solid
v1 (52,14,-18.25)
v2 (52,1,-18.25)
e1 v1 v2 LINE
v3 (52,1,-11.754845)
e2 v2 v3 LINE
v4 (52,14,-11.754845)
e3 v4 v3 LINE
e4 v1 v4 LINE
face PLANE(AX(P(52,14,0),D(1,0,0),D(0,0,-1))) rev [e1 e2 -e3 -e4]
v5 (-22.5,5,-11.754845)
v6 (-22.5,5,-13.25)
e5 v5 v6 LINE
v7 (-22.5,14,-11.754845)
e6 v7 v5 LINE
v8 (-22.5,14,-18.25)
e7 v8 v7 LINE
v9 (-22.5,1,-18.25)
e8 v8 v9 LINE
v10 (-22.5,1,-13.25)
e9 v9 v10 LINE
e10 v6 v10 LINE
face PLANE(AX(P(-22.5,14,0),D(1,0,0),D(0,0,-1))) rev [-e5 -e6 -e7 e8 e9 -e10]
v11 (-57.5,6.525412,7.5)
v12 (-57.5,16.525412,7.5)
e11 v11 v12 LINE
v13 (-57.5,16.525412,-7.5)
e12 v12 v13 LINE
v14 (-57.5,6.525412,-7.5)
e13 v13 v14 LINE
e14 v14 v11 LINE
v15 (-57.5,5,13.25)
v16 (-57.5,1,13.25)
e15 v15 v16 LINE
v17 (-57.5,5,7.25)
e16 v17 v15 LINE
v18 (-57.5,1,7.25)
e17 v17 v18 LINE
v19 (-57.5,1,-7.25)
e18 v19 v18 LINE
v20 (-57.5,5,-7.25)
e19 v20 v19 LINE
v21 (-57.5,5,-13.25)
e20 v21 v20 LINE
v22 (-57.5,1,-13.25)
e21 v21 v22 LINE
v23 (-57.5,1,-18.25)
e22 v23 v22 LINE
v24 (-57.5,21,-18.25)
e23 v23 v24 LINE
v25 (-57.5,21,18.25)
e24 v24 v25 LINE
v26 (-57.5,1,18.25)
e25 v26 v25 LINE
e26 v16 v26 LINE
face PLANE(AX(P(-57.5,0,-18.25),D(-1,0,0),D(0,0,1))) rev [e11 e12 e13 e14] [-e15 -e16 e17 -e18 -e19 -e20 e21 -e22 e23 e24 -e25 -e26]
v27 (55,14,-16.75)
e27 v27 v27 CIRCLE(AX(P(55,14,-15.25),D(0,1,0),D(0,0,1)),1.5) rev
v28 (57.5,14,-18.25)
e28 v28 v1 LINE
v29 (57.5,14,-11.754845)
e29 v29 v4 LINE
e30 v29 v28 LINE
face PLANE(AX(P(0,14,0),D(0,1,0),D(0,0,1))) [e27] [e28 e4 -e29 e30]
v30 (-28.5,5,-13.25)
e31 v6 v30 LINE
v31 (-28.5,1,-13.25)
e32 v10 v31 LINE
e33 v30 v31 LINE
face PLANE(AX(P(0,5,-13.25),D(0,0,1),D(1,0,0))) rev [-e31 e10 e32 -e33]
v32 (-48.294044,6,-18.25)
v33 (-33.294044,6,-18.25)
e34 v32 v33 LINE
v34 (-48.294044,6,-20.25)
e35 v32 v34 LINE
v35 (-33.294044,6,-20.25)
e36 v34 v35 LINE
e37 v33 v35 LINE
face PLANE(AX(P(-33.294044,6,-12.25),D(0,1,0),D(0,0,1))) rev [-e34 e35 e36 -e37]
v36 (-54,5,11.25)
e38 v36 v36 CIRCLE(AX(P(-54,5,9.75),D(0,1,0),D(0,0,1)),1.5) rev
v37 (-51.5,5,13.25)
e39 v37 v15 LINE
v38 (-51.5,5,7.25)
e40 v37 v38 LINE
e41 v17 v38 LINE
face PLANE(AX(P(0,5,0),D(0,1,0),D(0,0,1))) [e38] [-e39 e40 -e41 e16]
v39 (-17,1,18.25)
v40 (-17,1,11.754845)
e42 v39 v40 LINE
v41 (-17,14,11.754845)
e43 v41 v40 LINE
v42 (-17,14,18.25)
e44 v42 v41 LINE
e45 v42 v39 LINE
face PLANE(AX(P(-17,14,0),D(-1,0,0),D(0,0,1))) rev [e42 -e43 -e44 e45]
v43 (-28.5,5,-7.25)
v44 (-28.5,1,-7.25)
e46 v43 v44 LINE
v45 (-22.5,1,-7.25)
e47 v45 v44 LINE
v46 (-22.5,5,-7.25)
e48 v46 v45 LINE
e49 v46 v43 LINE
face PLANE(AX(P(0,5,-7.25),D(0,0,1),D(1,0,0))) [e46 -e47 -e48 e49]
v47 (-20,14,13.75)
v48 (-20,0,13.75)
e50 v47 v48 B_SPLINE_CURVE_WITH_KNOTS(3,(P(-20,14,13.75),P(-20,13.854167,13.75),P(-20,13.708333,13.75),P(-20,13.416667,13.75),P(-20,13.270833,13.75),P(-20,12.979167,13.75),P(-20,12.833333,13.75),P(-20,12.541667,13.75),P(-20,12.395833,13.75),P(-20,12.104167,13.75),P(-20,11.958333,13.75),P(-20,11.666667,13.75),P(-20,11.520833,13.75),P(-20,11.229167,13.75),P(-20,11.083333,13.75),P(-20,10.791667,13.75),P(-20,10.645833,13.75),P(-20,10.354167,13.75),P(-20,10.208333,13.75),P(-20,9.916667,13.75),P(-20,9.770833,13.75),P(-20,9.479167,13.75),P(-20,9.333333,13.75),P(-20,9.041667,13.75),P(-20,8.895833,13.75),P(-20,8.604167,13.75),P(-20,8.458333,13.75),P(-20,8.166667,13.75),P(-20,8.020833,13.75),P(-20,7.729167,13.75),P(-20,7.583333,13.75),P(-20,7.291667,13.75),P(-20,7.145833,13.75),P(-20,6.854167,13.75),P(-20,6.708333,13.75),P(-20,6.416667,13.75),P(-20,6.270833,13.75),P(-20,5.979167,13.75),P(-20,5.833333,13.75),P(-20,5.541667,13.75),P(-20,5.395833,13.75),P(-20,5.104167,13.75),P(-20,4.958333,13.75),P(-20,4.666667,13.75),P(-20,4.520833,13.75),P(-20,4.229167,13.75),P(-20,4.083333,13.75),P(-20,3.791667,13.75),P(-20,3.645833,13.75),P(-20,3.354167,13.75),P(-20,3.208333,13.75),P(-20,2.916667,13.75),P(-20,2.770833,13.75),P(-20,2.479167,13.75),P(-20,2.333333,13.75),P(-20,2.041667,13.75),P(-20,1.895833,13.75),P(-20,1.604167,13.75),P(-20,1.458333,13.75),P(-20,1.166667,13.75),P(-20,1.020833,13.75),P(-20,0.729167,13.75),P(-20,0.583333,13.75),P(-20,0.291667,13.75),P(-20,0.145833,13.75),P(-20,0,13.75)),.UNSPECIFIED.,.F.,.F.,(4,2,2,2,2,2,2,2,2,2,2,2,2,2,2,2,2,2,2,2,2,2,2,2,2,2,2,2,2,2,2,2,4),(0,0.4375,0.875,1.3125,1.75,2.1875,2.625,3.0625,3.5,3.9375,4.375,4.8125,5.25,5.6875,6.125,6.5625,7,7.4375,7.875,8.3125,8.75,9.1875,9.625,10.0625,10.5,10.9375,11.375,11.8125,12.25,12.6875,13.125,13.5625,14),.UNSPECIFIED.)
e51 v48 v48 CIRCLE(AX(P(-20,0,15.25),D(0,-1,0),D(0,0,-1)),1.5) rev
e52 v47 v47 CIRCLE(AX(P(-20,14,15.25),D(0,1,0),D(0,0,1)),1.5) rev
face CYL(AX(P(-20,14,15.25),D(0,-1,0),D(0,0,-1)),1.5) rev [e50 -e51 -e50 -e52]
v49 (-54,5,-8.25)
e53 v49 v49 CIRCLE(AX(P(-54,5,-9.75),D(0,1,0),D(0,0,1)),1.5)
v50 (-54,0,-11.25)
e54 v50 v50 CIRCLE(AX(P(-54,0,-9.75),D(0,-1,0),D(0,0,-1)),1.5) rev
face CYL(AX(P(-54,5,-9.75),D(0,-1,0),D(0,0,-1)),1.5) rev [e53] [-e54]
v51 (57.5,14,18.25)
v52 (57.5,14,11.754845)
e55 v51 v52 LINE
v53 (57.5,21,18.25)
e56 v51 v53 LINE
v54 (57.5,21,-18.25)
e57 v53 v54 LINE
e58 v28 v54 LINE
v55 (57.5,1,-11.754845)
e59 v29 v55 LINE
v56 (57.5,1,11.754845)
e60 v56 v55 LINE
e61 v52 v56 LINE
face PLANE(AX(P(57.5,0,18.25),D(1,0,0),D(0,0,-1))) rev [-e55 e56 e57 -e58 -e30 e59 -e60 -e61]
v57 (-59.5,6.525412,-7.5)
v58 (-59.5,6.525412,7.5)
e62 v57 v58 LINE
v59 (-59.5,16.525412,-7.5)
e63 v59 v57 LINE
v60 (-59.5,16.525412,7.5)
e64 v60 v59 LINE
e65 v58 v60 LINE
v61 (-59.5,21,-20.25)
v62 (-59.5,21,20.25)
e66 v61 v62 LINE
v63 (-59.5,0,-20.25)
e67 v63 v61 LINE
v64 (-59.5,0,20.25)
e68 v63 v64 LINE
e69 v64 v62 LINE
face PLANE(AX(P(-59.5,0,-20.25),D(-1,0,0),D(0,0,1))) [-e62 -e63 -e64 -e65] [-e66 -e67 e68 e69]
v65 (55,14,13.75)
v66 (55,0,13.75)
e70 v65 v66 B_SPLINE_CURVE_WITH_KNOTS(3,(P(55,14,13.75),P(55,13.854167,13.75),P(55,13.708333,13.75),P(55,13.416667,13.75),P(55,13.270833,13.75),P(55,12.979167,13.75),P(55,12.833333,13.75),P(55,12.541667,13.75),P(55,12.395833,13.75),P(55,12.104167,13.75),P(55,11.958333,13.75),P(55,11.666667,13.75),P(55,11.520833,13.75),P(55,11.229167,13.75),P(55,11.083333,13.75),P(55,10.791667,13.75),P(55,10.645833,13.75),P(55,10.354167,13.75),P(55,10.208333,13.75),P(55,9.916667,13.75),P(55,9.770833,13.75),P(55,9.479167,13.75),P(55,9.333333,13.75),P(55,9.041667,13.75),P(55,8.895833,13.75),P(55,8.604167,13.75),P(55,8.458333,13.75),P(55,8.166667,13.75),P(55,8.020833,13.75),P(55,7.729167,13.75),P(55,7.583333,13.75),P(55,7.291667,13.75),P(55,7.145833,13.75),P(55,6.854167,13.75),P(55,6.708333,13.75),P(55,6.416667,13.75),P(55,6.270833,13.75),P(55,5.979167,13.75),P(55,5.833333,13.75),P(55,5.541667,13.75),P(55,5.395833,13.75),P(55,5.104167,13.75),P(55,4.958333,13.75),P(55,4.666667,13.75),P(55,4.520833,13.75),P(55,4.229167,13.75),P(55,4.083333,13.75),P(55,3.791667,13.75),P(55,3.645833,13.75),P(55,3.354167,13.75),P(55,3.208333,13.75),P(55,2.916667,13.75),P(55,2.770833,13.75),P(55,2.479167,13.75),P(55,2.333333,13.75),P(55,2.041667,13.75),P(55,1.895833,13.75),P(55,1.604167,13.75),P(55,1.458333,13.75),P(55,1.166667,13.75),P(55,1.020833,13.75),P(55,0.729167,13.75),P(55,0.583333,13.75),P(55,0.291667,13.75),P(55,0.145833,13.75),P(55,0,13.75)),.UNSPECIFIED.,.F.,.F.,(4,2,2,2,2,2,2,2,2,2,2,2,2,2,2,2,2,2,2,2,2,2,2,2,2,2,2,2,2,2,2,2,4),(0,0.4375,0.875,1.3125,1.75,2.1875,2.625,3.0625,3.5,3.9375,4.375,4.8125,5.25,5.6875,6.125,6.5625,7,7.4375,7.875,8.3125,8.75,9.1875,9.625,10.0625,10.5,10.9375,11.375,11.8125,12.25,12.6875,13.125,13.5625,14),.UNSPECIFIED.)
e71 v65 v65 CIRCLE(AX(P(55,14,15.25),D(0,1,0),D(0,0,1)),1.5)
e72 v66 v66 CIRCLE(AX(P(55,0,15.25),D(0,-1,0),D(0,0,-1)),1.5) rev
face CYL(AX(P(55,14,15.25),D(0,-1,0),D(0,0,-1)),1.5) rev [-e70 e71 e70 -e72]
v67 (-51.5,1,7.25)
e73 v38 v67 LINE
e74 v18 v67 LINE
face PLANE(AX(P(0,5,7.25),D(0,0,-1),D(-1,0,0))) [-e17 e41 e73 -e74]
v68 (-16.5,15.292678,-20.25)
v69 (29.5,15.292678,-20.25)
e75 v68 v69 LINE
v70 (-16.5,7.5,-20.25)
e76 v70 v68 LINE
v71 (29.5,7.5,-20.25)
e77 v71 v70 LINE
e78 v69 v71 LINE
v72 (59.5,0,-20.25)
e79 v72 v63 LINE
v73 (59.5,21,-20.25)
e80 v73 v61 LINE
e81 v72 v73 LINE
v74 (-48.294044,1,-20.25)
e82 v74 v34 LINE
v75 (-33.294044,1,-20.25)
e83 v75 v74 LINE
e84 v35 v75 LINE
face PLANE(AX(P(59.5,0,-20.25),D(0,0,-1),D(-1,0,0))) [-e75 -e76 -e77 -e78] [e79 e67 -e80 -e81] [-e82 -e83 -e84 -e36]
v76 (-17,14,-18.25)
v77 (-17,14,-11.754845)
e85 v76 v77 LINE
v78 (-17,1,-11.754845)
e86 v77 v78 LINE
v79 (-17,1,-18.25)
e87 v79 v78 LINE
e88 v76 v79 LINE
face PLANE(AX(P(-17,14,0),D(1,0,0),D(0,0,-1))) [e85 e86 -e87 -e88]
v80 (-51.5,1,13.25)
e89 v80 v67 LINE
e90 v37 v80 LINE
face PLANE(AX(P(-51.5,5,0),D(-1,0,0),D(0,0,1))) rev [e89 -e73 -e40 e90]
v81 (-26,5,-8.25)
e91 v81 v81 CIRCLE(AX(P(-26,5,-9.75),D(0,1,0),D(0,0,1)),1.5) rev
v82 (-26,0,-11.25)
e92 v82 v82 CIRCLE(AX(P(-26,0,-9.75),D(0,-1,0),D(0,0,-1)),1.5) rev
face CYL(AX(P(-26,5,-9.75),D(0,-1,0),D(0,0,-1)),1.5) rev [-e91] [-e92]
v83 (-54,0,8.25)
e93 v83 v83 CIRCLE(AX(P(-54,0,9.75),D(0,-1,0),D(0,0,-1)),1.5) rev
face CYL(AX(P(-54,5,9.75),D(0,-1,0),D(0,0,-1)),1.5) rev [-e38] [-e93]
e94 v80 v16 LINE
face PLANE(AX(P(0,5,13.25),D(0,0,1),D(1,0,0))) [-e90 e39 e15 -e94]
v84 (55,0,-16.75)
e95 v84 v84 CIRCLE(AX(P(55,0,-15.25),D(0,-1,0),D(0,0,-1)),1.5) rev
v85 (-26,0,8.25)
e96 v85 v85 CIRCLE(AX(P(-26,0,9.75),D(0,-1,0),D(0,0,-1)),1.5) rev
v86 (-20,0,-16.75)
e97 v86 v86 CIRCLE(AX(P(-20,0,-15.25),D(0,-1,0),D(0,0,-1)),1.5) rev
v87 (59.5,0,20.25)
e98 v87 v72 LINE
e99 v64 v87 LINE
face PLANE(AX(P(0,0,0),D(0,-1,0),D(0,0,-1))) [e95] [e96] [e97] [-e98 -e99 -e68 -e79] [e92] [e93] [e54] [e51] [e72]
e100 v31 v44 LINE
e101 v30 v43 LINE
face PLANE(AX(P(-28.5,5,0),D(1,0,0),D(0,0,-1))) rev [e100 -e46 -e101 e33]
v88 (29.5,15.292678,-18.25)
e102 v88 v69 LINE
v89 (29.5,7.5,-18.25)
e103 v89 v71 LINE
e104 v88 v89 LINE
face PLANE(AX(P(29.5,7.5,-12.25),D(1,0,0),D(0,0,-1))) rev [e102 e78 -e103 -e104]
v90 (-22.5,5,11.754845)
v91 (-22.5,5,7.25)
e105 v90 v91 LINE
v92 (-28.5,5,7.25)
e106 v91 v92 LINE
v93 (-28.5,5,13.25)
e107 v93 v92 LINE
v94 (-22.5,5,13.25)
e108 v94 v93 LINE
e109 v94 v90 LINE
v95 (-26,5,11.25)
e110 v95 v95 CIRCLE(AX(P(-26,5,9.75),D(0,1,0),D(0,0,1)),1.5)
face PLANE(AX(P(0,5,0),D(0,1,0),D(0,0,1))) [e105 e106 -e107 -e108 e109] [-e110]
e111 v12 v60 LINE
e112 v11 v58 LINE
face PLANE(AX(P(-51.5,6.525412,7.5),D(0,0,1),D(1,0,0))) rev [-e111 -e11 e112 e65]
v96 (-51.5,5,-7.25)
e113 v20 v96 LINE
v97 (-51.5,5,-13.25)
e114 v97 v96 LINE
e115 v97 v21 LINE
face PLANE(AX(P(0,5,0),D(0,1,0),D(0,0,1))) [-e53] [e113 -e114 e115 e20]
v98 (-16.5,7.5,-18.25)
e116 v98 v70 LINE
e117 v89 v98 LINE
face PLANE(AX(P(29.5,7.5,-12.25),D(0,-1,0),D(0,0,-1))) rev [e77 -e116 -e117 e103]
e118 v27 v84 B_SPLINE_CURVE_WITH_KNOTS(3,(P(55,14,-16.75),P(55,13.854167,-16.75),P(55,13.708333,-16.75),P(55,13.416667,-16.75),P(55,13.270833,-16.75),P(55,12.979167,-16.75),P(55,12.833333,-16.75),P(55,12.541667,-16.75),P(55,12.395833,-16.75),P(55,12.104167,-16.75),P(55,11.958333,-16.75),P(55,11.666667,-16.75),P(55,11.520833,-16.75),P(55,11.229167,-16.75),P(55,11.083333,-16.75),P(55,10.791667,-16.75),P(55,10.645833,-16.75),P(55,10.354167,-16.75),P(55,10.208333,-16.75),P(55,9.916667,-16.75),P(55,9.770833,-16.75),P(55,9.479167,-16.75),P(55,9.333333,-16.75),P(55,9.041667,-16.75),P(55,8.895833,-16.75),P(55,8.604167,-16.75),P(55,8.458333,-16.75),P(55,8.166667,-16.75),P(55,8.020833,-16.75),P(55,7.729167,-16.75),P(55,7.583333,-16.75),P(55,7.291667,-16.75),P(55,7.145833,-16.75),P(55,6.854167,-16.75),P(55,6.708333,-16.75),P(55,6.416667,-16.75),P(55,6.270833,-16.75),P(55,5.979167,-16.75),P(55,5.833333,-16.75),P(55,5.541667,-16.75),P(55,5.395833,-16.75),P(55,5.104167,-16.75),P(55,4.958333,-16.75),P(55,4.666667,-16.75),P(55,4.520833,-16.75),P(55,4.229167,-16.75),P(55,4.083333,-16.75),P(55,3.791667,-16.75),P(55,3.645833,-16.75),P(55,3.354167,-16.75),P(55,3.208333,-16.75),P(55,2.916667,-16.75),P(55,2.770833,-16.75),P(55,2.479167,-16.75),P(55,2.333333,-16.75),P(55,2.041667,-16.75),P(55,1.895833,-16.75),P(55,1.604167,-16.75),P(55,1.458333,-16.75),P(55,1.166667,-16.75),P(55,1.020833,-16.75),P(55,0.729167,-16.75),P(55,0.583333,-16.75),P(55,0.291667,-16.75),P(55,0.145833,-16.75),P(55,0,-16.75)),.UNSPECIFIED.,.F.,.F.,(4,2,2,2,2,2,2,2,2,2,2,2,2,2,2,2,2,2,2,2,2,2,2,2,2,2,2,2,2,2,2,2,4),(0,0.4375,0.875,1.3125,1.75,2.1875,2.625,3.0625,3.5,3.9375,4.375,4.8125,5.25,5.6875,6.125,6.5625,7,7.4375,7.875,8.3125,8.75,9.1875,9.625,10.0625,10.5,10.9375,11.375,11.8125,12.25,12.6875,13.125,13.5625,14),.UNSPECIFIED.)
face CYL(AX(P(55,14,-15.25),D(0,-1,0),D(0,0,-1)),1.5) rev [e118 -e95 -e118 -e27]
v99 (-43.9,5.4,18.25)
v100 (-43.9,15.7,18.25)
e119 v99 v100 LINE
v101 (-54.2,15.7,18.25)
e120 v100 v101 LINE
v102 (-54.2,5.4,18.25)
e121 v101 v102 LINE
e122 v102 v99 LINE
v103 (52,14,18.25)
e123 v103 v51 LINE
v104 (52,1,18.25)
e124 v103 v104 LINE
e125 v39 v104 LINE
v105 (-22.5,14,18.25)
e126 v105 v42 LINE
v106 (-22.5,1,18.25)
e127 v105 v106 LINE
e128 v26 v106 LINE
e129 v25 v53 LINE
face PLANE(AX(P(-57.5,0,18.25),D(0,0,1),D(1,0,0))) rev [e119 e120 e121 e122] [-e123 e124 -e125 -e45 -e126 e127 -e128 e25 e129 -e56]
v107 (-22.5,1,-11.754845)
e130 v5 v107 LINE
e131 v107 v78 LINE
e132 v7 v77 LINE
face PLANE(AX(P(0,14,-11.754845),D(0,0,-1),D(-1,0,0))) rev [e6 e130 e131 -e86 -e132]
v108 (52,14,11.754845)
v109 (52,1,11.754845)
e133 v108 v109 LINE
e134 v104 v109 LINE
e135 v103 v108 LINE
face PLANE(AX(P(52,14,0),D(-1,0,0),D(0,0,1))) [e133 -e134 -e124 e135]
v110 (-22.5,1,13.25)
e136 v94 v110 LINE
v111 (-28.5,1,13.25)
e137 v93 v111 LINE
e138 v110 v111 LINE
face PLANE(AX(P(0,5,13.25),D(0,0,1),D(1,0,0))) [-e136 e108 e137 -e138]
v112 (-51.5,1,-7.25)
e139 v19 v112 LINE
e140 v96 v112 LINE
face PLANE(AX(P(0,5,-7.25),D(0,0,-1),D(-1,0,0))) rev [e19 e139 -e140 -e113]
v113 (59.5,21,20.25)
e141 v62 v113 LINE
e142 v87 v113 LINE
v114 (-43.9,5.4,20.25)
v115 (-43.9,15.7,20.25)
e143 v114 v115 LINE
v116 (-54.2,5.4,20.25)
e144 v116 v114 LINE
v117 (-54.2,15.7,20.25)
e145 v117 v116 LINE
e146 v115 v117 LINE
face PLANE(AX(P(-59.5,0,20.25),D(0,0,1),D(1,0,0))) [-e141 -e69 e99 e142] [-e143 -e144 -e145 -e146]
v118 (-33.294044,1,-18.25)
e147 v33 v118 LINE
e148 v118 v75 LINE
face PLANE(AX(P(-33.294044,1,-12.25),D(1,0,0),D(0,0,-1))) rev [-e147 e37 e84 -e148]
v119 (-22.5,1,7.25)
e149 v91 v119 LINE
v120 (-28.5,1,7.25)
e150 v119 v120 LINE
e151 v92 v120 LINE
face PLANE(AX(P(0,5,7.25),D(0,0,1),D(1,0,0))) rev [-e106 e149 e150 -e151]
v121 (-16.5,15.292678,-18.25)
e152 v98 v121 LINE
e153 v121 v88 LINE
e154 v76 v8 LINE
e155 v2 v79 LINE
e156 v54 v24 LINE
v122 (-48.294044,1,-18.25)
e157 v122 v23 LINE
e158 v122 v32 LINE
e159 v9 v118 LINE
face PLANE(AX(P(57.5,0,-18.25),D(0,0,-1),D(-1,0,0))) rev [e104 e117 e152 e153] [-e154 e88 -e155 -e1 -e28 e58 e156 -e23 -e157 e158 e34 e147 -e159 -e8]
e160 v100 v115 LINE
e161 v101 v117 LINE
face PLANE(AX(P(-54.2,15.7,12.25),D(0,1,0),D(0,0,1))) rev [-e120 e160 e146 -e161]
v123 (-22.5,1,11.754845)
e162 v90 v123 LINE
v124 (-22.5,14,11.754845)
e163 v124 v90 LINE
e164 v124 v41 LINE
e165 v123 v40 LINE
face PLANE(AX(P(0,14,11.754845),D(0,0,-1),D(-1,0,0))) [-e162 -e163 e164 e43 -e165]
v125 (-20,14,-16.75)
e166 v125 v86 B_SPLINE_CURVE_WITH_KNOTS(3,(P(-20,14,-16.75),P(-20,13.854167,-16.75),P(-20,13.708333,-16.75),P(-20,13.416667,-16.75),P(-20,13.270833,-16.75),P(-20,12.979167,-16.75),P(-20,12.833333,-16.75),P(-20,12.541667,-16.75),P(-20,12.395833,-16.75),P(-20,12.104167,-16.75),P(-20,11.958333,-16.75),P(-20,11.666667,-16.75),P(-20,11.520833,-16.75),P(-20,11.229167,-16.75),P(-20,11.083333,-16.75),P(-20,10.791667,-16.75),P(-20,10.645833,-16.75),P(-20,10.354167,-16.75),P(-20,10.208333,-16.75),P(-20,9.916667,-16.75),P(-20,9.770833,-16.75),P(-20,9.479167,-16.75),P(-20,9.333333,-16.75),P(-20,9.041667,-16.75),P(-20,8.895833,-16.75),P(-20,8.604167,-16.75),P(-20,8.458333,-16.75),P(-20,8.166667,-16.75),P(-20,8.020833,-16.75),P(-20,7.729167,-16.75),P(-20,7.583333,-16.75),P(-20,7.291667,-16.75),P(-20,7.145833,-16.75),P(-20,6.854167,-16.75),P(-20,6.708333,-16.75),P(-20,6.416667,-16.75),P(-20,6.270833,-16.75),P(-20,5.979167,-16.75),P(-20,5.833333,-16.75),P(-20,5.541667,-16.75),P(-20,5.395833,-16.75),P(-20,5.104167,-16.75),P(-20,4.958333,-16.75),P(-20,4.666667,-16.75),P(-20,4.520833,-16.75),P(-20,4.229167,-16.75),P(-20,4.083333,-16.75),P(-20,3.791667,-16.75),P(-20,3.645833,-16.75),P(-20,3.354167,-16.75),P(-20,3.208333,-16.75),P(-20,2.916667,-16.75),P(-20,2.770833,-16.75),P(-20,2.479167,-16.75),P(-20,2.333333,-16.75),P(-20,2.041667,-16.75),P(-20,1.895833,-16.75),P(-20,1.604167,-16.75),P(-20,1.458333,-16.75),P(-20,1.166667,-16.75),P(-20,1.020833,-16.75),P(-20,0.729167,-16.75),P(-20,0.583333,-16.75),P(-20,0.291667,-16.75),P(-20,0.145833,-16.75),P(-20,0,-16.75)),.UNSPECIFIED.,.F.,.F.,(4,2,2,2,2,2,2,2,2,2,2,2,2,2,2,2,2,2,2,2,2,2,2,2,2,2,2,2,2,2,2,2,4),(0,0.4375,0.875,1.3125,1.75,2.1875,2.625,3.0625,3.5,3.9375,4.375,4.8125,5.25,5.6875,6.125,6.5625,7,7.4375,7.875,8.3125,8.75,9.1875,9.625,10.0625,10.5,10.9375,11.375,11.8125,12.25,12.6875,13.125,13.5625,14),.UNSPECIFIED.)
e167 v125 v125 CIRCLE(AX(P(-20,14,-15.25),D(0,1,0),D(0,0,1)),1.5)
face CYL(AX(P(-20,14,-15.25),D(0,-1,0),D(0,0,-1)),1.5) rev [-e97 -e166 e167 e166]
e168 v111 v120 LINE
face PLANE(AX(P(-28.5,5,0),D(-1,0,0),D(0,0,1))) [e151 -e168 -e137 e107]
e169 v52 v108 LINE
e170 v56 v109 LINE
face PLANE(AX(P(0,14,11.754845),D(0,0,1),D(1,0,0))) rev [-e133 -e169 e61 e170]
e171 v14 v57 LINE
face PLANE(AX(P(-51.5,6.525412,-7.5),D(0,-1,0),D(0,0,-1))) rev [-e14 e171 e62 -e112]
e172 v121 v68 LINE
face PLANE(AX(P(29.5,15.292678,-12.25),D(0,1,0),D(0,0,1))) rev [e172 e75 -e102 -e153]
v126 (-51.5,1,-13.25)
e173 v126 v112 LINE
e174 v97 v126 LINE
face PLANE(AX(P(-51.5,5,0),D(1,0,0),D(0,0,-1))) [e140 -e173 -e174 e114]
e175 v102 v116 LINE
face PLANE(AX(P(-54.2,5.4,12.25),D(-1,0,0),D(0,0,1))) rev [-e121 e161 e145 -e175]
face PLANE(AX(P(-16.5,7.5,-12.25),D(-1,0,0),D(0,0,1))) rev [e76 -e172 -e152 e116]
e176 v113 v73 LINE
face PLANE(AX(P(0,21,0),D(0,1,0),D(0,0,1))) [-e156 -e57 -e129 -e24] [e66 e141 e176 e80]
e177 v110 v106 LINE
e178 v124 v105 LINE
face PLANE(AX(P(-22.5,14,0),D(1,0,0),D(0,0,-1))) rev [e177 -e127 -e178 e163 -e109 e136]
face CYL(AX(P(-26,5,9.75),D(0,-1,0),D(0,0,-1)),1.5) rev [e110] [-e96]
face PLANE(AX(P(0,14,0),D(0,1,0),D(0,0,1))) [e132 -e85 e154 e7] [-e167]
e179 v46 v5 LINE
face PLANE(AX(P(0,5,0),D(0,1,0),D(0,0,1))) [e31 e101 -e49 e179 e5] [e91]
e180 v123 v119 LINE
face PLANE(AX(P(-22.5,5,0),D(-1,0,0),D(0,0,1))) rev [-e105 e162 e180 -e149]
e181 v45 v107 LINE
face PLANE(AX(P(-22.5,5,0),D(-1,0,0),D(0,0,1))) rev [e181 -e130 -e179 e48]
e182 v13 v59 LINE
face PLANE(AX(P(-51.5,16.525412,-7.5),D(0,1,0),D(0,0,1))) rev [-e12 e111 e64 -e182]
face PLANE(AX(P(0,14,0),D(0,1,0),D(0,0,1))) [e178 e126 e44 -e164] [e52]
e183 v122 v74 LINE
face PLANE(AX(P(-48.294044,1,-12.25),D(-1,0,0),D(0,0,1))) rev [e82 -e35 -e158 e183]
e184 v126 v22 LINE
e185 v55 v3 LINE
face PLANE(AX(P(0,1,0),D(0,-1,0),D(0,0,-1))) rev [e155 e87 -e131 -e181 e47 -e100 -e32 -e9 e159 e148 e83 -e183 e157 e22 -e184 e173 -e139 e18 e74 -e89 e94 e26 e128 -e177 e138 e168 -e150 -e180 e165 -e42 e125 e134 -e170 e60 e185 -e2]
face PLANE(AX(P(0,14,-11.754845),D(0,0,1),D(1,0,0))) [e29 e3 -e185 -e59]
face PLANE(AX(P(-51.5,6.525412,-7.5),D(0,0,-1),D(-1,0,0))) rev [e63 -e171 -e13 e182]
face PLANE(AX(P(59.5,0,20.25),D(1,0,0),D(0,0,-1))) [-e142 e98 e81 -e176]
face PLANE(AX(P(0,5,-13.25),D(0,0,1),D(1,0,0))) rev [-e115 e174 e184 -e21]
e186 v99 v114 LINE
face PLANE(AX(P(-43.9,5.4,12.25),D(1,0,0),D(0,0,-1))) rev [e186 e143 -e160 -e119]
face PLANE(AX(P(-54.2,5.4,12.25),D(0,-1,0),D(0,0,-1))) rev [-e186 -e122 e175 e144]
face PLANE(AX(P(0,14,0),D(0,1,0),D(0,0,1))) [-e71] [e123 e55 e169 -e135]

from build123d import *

# Parameters (mm, degrees)
SKETCH1_W                = 115
SKETCH1_H                = 36.5
BOSS_EXTRUDE1_DEPTH      = 1
BOSS_EXTRUDE2_DEPTH      = 20
BOSS_EXTRUDE2_DEPTH_BACK = 1
SKETCH2_W                = 119
SKETCH2_H                = 40.5
SKETCH2_W_2              = 115
SKETCH2_H_2              = 36.5
SKETCH3_R                = 1.5
SKETCH3_W                = 6
SKETCH3_H                = 6
BOSS_EXTRUDE3_DEPTH      = 4
SKETCH4_R                = 1.5
SKETCH4_W                = 5.5
SKETCH4_H                = 6.495155074
BOSS_EXTRUDE4_DEPTH      = 13
SKETCH5_W                = 15
SKETCH5_H                = 10
CUT_EXTRUDE1_DEPTH       = 8
SKETCH6_W                = 46
SKETCH6_H                = 7.792677535
CUT_EXTRUDE2_DEPTH       = 8
SKETCH7_W                = 10.3
SKETCH7_H                = 10.3
CUT_EXTRUDE3_DEPTH       = 8
SKETCH8_W                = 15
SKETCH8_H                = 5
CUT_EXTRUDE4_DEPTH       = 8
SKETCH9_W                = 119
SKETCH9_H                = 40.5
SKETCH9_W_2              = 17
SKETCH9_H_2              = 17
SKETCH9_W_3              = 73
SKETCH9_H_3              = 26
BOSS_EXTRUDE5_DEPTH      = 3
CUT_EXTRUDE5_DEPTH       = 10
CUT_EXTRUDE5_DEPTH_BACK  = 10
SKETCH10_R               = 1.5


with BuildPart() as part:
    # Sketch1 → Boss-Extrude1 (new body)
    with BuildSketch(Plane(origin=(0, 0, 0), x_dir=(1, 0, 0), z_dir=(0, 1, 0))):
        Rectangle(SKETCH1_W, SKETCH1_H)
    extrude(amount=BOSS_EXTRUDE1_DEPTH)


with BuildPart() as body_2:
    # Sketch2 → Boss-Extrude2 (new, two sides: drawn at the far end of the back side and taken through both)
    with BuildSketch(Plane(origin=(0, 1, 0), x_dir=(1, 0, 0), z_dir=(0, 1, 0)).offset(-BOSS_EXTRUDE2_DEPTH_BACK)):
        Rectangle(SKETCH2_W, SKETCH2_H)
        Rectangle(SKETCH2_W_2, SKETCH2_H_2, mode=Mode.SUBTRACT)
    extrude(amount=BOSS_EXTRUDE2_DEPTH + BOSS_EXTRUDE2_DEPTH_BACK)

    # Intersect1: read off the stored shape, not the designer's step
    # Intersect1: union part
    add(part.part)

    # Sketch3 → Boss-Extrude3 (add)
    # profile 1 of 4: a face of its own
    with BuildSketch(Plane(origin=(0, 1, 0), x_dir=(1, 0, 0), z_dir=(0, 1, 0))):
        Polygon((-51.5, 7.25), (-51.5, 13.25), (-54, 13.25), (-57.5, 13.25), (-57.5, 9.75), (-57.5, 7.25), align=None)
        with Locations(Location((-54, 9.75, 0), (0, 0, 270))):
            Circle(SKETCH3_R, mode=Mode.SUBTRACT)
    # profile 2 of 4: a face of its own
    with BuildSketch(Plane(origin=(0, 1, 0), x_dir=(1, 0, 0), z_dir=(0, 1, 0))):
        with Locations((-25.5, 10.25)):
            Rectangle(SKETCH3_W, SKETCH3_H)
        with Locations(Location((-26, 9.75, 0), (0, 0, 90))):
            Circle(SKETCH3_R, mode=Mode.SUBTRACT)
    # profile 3 of 4: a face of its own
    with BuildSketch(Plane(origin=(0, 1, 0), x_dir=(1, 0, 0), z_dir=(0, 1, 0))):
        with Locations((-25.5, -10.25)):
            Rectangle(SKETCH3_W, SKETCH3_H)
        with Locations(Location((-26, -9.75, 0), (0, 0, 270))):
            Circle(SKETCH3_R, mode=Mode.SUBTRACT)
    # profile 4 of 4: a face of its own
    with BuildSketch(Plane(origin=(0, 1, 0), x_dir=(1, 0, 0), z_dir=(0, 1, 0))):
        with Locations((-54.5, -10.25)):
            Rectangle(SKETCH3_W, SKETCH3_H)
        with Locations(Location((-54, -9.75, 0), (0, 0, 90))):
            Circle(SKETCH3_R, mode=Mode.SUBTRACT)
    extrude(amount=BOSS_EXTRUDE3_DEPTH)

    # Sketch4 → Boss-Extrude4 (add)
    # profile 1 of 4: a face of its own
    with BuildSketch(Plane(origin=(0, 1, 0), x_dir=(1, 0, 0), z_dir=(0, 1, 0))):
        Polygon((-22.5, 13.25), (-22.5, 11.754844926), (-17, 11.754844926), (-17, 18.25), (-20, 18.25), (-22.5, 18.25), (-22.5, 15.25), align=None)
        with Locations(Location((-20, 15.25, 0), (0, 0, 90))):
            Circle(SKETCH4_R, mode=Mode.SUBTRACT)
    # profile 2 of 4: a face of its own
    with BuildSketch(Plane(origin=(0, 1, 0), x_dir=(1, 0, 0), z_dir=(0, 1, 0))):
        with Locations((-19.75, -15.002422463)):
            Rectangle(SKETCH4_W, SKETCH4_H)
        with Locations(Location((-20, -15.25, 0), (0, 0, 90))):
            Circle(SKETCH4_R, mode=Mode.SUBTRACT)
    # profile 3 of 4: a face of its own
    with BuildSketch(Plane(origin=(0, 1, 0), x_dir=(1, 0, 0), z_dir=(0, 1, 0))):
        with Locations((54.75, -15.002422463)):
            Rectangle(SKETCH4_W, SKETCH4_H)
        with Locations(Location((55, -15.25, 0), (0, 0, 90))):
            Circle(SKETCH4_R, mode=Mode.SUBTRACT)
    # profile 4 of 4: a face of its own
    with BuildSketch(Plane(origin=(0, 1, 0), x_dir=(1, 0, 0), z_dir=(0, 1, 0))):
        with Locations((54.75, 15.002422463)):
            Rectangle(SKETCH4_W, SKETCH4_H)
        with Locations(Location((55, 15.25, 0), (0, 0, 90))):
            Circle(SKETCH4_R, mode=Mode.SUBTRACT)
    extrude(amount=BOSS_EXTRUDE4_DEPTH)

    # Sketch5 → Cut-Extrude1 (cut)
    with BuildSketch(Plane.ZY.offset(59.5)):
        with Locations((0, 11.525411997)):
            Rectangle(SKETCH5_W, SKETCH5_H)
    extrude(amount=-CUT_EXTRUDE1_DEPTH, mode=Mode.SUBTRACT)

    # Sketch6 → Cut-Extrude2 (cut)
    with BuildSketch(Plane(origin=(0, 0, -20.25), x_dir=(-1, 0, 0), z_dir=(0, 0, -1))):
        with Locations((-6.5, 11.396338768)):
            Rectangle(SKETCH6_W, SKETCH6_H)
    extrude(amount=-CUT_EXTRUDE2_DEPTH, mode=Mode.SUBTRACT)

    # Sketch7 → Cut-Extrude3 (cut)
    with BuildSketch(Plane.XY.offset(20.25)):
        with Locations((-49.05, 10.55)):
            Rectangle(SKETCH7_W, SKETCH7_H)
    extrude(amount=-CUT_EXTRUDE3_DEPTH, mode=Mode.SUBTRACT)

    # Sketch8 → Cut-Extrude4 (cut)
    with BuildSketch(Plane(origin=(0, 0, -20.25), x_dir=(-1, 0, 0), z_dir=(0, 0, -1))):
        with Locations((40.794043984, 3.5)):
            Rectangle(SKETCH8_W, SKETCH8_H)
    extrude(amount=-CUT_EXTRUDE4_DEPTH, mode=Mode.SUBTRACT)

    # Sketch10 → Cut-Extrude5 (cut, two sides: drawn at the far end of the back side and taken through both)
    with BuildSketch(Plane(origin=(0, 1, 0), x_dir=(1, 0, 0), z_dir=(0, 1, 0)).offset(-CUT_EXTRUDE5_DEPTH_BACK)):
        with Locations(Location((55, 15.25, 0), (0, 0, 90))):
            Circle(SKETCH10_R)
        with Locations(Location((55, -15.25, 0), (0, 0, 90))):
            Circle(SKETCH10_R)
        with Locations(Location((-54, -9.75, 0), (0, 0, 90))):
            Circle(SKETCH10_R)
        with Locations(Location((-20, -15.25, 0), (0, 0, 90))):
            Circle(SKETCH10_R)
        with Locations(Location((-26, -9.75, 0), (0, 0, 90))):
            Circle(SKETCH10_R)
        with Locations(Location((-20, 15.25, 0), (0, 0, 90))):
            Circle(SKETCH10_R)
        with Locations(Location((-26, 9.75, 0), (0, 0, 90))):
            Circle(SKETCH10_R)
        with Locations(Location((-54, 9.75, 0), (0, 0, 90))):
            Circle(SKETCH10_R)
    extrude(amount=CUT_EXTRUDE5_DEPTH + CUT_EXTRUDE5_DEPTH_BACK, mode=Mode.SUBTRACT)


with BuildPart() as body_2_2:
    # Sketch9 → Boss-Extrude5 (new body)
    with BuildSketch(Plane(origin=(0, 21, 0), x_dir=(1, 0, 0), z_dir=(0, 1, 0))):
        Rectangle(SKETCH9_W, SKETCH9_H)
        with Locations((-40, 1.75)):
            Rectangle(SKETCH9_W_2, SKETCH9_H_2, mode=Mode.SUBTRACT)
        with Locations((17.25, -0.25)):
            Rectangle(SKETCH9_W_3, SKETCH9_H_3, mode=Mode.SUBTRACT)
    extrude(amount=BOSS_EXTRUDE5_DEPTH)


solid = body_2.part
